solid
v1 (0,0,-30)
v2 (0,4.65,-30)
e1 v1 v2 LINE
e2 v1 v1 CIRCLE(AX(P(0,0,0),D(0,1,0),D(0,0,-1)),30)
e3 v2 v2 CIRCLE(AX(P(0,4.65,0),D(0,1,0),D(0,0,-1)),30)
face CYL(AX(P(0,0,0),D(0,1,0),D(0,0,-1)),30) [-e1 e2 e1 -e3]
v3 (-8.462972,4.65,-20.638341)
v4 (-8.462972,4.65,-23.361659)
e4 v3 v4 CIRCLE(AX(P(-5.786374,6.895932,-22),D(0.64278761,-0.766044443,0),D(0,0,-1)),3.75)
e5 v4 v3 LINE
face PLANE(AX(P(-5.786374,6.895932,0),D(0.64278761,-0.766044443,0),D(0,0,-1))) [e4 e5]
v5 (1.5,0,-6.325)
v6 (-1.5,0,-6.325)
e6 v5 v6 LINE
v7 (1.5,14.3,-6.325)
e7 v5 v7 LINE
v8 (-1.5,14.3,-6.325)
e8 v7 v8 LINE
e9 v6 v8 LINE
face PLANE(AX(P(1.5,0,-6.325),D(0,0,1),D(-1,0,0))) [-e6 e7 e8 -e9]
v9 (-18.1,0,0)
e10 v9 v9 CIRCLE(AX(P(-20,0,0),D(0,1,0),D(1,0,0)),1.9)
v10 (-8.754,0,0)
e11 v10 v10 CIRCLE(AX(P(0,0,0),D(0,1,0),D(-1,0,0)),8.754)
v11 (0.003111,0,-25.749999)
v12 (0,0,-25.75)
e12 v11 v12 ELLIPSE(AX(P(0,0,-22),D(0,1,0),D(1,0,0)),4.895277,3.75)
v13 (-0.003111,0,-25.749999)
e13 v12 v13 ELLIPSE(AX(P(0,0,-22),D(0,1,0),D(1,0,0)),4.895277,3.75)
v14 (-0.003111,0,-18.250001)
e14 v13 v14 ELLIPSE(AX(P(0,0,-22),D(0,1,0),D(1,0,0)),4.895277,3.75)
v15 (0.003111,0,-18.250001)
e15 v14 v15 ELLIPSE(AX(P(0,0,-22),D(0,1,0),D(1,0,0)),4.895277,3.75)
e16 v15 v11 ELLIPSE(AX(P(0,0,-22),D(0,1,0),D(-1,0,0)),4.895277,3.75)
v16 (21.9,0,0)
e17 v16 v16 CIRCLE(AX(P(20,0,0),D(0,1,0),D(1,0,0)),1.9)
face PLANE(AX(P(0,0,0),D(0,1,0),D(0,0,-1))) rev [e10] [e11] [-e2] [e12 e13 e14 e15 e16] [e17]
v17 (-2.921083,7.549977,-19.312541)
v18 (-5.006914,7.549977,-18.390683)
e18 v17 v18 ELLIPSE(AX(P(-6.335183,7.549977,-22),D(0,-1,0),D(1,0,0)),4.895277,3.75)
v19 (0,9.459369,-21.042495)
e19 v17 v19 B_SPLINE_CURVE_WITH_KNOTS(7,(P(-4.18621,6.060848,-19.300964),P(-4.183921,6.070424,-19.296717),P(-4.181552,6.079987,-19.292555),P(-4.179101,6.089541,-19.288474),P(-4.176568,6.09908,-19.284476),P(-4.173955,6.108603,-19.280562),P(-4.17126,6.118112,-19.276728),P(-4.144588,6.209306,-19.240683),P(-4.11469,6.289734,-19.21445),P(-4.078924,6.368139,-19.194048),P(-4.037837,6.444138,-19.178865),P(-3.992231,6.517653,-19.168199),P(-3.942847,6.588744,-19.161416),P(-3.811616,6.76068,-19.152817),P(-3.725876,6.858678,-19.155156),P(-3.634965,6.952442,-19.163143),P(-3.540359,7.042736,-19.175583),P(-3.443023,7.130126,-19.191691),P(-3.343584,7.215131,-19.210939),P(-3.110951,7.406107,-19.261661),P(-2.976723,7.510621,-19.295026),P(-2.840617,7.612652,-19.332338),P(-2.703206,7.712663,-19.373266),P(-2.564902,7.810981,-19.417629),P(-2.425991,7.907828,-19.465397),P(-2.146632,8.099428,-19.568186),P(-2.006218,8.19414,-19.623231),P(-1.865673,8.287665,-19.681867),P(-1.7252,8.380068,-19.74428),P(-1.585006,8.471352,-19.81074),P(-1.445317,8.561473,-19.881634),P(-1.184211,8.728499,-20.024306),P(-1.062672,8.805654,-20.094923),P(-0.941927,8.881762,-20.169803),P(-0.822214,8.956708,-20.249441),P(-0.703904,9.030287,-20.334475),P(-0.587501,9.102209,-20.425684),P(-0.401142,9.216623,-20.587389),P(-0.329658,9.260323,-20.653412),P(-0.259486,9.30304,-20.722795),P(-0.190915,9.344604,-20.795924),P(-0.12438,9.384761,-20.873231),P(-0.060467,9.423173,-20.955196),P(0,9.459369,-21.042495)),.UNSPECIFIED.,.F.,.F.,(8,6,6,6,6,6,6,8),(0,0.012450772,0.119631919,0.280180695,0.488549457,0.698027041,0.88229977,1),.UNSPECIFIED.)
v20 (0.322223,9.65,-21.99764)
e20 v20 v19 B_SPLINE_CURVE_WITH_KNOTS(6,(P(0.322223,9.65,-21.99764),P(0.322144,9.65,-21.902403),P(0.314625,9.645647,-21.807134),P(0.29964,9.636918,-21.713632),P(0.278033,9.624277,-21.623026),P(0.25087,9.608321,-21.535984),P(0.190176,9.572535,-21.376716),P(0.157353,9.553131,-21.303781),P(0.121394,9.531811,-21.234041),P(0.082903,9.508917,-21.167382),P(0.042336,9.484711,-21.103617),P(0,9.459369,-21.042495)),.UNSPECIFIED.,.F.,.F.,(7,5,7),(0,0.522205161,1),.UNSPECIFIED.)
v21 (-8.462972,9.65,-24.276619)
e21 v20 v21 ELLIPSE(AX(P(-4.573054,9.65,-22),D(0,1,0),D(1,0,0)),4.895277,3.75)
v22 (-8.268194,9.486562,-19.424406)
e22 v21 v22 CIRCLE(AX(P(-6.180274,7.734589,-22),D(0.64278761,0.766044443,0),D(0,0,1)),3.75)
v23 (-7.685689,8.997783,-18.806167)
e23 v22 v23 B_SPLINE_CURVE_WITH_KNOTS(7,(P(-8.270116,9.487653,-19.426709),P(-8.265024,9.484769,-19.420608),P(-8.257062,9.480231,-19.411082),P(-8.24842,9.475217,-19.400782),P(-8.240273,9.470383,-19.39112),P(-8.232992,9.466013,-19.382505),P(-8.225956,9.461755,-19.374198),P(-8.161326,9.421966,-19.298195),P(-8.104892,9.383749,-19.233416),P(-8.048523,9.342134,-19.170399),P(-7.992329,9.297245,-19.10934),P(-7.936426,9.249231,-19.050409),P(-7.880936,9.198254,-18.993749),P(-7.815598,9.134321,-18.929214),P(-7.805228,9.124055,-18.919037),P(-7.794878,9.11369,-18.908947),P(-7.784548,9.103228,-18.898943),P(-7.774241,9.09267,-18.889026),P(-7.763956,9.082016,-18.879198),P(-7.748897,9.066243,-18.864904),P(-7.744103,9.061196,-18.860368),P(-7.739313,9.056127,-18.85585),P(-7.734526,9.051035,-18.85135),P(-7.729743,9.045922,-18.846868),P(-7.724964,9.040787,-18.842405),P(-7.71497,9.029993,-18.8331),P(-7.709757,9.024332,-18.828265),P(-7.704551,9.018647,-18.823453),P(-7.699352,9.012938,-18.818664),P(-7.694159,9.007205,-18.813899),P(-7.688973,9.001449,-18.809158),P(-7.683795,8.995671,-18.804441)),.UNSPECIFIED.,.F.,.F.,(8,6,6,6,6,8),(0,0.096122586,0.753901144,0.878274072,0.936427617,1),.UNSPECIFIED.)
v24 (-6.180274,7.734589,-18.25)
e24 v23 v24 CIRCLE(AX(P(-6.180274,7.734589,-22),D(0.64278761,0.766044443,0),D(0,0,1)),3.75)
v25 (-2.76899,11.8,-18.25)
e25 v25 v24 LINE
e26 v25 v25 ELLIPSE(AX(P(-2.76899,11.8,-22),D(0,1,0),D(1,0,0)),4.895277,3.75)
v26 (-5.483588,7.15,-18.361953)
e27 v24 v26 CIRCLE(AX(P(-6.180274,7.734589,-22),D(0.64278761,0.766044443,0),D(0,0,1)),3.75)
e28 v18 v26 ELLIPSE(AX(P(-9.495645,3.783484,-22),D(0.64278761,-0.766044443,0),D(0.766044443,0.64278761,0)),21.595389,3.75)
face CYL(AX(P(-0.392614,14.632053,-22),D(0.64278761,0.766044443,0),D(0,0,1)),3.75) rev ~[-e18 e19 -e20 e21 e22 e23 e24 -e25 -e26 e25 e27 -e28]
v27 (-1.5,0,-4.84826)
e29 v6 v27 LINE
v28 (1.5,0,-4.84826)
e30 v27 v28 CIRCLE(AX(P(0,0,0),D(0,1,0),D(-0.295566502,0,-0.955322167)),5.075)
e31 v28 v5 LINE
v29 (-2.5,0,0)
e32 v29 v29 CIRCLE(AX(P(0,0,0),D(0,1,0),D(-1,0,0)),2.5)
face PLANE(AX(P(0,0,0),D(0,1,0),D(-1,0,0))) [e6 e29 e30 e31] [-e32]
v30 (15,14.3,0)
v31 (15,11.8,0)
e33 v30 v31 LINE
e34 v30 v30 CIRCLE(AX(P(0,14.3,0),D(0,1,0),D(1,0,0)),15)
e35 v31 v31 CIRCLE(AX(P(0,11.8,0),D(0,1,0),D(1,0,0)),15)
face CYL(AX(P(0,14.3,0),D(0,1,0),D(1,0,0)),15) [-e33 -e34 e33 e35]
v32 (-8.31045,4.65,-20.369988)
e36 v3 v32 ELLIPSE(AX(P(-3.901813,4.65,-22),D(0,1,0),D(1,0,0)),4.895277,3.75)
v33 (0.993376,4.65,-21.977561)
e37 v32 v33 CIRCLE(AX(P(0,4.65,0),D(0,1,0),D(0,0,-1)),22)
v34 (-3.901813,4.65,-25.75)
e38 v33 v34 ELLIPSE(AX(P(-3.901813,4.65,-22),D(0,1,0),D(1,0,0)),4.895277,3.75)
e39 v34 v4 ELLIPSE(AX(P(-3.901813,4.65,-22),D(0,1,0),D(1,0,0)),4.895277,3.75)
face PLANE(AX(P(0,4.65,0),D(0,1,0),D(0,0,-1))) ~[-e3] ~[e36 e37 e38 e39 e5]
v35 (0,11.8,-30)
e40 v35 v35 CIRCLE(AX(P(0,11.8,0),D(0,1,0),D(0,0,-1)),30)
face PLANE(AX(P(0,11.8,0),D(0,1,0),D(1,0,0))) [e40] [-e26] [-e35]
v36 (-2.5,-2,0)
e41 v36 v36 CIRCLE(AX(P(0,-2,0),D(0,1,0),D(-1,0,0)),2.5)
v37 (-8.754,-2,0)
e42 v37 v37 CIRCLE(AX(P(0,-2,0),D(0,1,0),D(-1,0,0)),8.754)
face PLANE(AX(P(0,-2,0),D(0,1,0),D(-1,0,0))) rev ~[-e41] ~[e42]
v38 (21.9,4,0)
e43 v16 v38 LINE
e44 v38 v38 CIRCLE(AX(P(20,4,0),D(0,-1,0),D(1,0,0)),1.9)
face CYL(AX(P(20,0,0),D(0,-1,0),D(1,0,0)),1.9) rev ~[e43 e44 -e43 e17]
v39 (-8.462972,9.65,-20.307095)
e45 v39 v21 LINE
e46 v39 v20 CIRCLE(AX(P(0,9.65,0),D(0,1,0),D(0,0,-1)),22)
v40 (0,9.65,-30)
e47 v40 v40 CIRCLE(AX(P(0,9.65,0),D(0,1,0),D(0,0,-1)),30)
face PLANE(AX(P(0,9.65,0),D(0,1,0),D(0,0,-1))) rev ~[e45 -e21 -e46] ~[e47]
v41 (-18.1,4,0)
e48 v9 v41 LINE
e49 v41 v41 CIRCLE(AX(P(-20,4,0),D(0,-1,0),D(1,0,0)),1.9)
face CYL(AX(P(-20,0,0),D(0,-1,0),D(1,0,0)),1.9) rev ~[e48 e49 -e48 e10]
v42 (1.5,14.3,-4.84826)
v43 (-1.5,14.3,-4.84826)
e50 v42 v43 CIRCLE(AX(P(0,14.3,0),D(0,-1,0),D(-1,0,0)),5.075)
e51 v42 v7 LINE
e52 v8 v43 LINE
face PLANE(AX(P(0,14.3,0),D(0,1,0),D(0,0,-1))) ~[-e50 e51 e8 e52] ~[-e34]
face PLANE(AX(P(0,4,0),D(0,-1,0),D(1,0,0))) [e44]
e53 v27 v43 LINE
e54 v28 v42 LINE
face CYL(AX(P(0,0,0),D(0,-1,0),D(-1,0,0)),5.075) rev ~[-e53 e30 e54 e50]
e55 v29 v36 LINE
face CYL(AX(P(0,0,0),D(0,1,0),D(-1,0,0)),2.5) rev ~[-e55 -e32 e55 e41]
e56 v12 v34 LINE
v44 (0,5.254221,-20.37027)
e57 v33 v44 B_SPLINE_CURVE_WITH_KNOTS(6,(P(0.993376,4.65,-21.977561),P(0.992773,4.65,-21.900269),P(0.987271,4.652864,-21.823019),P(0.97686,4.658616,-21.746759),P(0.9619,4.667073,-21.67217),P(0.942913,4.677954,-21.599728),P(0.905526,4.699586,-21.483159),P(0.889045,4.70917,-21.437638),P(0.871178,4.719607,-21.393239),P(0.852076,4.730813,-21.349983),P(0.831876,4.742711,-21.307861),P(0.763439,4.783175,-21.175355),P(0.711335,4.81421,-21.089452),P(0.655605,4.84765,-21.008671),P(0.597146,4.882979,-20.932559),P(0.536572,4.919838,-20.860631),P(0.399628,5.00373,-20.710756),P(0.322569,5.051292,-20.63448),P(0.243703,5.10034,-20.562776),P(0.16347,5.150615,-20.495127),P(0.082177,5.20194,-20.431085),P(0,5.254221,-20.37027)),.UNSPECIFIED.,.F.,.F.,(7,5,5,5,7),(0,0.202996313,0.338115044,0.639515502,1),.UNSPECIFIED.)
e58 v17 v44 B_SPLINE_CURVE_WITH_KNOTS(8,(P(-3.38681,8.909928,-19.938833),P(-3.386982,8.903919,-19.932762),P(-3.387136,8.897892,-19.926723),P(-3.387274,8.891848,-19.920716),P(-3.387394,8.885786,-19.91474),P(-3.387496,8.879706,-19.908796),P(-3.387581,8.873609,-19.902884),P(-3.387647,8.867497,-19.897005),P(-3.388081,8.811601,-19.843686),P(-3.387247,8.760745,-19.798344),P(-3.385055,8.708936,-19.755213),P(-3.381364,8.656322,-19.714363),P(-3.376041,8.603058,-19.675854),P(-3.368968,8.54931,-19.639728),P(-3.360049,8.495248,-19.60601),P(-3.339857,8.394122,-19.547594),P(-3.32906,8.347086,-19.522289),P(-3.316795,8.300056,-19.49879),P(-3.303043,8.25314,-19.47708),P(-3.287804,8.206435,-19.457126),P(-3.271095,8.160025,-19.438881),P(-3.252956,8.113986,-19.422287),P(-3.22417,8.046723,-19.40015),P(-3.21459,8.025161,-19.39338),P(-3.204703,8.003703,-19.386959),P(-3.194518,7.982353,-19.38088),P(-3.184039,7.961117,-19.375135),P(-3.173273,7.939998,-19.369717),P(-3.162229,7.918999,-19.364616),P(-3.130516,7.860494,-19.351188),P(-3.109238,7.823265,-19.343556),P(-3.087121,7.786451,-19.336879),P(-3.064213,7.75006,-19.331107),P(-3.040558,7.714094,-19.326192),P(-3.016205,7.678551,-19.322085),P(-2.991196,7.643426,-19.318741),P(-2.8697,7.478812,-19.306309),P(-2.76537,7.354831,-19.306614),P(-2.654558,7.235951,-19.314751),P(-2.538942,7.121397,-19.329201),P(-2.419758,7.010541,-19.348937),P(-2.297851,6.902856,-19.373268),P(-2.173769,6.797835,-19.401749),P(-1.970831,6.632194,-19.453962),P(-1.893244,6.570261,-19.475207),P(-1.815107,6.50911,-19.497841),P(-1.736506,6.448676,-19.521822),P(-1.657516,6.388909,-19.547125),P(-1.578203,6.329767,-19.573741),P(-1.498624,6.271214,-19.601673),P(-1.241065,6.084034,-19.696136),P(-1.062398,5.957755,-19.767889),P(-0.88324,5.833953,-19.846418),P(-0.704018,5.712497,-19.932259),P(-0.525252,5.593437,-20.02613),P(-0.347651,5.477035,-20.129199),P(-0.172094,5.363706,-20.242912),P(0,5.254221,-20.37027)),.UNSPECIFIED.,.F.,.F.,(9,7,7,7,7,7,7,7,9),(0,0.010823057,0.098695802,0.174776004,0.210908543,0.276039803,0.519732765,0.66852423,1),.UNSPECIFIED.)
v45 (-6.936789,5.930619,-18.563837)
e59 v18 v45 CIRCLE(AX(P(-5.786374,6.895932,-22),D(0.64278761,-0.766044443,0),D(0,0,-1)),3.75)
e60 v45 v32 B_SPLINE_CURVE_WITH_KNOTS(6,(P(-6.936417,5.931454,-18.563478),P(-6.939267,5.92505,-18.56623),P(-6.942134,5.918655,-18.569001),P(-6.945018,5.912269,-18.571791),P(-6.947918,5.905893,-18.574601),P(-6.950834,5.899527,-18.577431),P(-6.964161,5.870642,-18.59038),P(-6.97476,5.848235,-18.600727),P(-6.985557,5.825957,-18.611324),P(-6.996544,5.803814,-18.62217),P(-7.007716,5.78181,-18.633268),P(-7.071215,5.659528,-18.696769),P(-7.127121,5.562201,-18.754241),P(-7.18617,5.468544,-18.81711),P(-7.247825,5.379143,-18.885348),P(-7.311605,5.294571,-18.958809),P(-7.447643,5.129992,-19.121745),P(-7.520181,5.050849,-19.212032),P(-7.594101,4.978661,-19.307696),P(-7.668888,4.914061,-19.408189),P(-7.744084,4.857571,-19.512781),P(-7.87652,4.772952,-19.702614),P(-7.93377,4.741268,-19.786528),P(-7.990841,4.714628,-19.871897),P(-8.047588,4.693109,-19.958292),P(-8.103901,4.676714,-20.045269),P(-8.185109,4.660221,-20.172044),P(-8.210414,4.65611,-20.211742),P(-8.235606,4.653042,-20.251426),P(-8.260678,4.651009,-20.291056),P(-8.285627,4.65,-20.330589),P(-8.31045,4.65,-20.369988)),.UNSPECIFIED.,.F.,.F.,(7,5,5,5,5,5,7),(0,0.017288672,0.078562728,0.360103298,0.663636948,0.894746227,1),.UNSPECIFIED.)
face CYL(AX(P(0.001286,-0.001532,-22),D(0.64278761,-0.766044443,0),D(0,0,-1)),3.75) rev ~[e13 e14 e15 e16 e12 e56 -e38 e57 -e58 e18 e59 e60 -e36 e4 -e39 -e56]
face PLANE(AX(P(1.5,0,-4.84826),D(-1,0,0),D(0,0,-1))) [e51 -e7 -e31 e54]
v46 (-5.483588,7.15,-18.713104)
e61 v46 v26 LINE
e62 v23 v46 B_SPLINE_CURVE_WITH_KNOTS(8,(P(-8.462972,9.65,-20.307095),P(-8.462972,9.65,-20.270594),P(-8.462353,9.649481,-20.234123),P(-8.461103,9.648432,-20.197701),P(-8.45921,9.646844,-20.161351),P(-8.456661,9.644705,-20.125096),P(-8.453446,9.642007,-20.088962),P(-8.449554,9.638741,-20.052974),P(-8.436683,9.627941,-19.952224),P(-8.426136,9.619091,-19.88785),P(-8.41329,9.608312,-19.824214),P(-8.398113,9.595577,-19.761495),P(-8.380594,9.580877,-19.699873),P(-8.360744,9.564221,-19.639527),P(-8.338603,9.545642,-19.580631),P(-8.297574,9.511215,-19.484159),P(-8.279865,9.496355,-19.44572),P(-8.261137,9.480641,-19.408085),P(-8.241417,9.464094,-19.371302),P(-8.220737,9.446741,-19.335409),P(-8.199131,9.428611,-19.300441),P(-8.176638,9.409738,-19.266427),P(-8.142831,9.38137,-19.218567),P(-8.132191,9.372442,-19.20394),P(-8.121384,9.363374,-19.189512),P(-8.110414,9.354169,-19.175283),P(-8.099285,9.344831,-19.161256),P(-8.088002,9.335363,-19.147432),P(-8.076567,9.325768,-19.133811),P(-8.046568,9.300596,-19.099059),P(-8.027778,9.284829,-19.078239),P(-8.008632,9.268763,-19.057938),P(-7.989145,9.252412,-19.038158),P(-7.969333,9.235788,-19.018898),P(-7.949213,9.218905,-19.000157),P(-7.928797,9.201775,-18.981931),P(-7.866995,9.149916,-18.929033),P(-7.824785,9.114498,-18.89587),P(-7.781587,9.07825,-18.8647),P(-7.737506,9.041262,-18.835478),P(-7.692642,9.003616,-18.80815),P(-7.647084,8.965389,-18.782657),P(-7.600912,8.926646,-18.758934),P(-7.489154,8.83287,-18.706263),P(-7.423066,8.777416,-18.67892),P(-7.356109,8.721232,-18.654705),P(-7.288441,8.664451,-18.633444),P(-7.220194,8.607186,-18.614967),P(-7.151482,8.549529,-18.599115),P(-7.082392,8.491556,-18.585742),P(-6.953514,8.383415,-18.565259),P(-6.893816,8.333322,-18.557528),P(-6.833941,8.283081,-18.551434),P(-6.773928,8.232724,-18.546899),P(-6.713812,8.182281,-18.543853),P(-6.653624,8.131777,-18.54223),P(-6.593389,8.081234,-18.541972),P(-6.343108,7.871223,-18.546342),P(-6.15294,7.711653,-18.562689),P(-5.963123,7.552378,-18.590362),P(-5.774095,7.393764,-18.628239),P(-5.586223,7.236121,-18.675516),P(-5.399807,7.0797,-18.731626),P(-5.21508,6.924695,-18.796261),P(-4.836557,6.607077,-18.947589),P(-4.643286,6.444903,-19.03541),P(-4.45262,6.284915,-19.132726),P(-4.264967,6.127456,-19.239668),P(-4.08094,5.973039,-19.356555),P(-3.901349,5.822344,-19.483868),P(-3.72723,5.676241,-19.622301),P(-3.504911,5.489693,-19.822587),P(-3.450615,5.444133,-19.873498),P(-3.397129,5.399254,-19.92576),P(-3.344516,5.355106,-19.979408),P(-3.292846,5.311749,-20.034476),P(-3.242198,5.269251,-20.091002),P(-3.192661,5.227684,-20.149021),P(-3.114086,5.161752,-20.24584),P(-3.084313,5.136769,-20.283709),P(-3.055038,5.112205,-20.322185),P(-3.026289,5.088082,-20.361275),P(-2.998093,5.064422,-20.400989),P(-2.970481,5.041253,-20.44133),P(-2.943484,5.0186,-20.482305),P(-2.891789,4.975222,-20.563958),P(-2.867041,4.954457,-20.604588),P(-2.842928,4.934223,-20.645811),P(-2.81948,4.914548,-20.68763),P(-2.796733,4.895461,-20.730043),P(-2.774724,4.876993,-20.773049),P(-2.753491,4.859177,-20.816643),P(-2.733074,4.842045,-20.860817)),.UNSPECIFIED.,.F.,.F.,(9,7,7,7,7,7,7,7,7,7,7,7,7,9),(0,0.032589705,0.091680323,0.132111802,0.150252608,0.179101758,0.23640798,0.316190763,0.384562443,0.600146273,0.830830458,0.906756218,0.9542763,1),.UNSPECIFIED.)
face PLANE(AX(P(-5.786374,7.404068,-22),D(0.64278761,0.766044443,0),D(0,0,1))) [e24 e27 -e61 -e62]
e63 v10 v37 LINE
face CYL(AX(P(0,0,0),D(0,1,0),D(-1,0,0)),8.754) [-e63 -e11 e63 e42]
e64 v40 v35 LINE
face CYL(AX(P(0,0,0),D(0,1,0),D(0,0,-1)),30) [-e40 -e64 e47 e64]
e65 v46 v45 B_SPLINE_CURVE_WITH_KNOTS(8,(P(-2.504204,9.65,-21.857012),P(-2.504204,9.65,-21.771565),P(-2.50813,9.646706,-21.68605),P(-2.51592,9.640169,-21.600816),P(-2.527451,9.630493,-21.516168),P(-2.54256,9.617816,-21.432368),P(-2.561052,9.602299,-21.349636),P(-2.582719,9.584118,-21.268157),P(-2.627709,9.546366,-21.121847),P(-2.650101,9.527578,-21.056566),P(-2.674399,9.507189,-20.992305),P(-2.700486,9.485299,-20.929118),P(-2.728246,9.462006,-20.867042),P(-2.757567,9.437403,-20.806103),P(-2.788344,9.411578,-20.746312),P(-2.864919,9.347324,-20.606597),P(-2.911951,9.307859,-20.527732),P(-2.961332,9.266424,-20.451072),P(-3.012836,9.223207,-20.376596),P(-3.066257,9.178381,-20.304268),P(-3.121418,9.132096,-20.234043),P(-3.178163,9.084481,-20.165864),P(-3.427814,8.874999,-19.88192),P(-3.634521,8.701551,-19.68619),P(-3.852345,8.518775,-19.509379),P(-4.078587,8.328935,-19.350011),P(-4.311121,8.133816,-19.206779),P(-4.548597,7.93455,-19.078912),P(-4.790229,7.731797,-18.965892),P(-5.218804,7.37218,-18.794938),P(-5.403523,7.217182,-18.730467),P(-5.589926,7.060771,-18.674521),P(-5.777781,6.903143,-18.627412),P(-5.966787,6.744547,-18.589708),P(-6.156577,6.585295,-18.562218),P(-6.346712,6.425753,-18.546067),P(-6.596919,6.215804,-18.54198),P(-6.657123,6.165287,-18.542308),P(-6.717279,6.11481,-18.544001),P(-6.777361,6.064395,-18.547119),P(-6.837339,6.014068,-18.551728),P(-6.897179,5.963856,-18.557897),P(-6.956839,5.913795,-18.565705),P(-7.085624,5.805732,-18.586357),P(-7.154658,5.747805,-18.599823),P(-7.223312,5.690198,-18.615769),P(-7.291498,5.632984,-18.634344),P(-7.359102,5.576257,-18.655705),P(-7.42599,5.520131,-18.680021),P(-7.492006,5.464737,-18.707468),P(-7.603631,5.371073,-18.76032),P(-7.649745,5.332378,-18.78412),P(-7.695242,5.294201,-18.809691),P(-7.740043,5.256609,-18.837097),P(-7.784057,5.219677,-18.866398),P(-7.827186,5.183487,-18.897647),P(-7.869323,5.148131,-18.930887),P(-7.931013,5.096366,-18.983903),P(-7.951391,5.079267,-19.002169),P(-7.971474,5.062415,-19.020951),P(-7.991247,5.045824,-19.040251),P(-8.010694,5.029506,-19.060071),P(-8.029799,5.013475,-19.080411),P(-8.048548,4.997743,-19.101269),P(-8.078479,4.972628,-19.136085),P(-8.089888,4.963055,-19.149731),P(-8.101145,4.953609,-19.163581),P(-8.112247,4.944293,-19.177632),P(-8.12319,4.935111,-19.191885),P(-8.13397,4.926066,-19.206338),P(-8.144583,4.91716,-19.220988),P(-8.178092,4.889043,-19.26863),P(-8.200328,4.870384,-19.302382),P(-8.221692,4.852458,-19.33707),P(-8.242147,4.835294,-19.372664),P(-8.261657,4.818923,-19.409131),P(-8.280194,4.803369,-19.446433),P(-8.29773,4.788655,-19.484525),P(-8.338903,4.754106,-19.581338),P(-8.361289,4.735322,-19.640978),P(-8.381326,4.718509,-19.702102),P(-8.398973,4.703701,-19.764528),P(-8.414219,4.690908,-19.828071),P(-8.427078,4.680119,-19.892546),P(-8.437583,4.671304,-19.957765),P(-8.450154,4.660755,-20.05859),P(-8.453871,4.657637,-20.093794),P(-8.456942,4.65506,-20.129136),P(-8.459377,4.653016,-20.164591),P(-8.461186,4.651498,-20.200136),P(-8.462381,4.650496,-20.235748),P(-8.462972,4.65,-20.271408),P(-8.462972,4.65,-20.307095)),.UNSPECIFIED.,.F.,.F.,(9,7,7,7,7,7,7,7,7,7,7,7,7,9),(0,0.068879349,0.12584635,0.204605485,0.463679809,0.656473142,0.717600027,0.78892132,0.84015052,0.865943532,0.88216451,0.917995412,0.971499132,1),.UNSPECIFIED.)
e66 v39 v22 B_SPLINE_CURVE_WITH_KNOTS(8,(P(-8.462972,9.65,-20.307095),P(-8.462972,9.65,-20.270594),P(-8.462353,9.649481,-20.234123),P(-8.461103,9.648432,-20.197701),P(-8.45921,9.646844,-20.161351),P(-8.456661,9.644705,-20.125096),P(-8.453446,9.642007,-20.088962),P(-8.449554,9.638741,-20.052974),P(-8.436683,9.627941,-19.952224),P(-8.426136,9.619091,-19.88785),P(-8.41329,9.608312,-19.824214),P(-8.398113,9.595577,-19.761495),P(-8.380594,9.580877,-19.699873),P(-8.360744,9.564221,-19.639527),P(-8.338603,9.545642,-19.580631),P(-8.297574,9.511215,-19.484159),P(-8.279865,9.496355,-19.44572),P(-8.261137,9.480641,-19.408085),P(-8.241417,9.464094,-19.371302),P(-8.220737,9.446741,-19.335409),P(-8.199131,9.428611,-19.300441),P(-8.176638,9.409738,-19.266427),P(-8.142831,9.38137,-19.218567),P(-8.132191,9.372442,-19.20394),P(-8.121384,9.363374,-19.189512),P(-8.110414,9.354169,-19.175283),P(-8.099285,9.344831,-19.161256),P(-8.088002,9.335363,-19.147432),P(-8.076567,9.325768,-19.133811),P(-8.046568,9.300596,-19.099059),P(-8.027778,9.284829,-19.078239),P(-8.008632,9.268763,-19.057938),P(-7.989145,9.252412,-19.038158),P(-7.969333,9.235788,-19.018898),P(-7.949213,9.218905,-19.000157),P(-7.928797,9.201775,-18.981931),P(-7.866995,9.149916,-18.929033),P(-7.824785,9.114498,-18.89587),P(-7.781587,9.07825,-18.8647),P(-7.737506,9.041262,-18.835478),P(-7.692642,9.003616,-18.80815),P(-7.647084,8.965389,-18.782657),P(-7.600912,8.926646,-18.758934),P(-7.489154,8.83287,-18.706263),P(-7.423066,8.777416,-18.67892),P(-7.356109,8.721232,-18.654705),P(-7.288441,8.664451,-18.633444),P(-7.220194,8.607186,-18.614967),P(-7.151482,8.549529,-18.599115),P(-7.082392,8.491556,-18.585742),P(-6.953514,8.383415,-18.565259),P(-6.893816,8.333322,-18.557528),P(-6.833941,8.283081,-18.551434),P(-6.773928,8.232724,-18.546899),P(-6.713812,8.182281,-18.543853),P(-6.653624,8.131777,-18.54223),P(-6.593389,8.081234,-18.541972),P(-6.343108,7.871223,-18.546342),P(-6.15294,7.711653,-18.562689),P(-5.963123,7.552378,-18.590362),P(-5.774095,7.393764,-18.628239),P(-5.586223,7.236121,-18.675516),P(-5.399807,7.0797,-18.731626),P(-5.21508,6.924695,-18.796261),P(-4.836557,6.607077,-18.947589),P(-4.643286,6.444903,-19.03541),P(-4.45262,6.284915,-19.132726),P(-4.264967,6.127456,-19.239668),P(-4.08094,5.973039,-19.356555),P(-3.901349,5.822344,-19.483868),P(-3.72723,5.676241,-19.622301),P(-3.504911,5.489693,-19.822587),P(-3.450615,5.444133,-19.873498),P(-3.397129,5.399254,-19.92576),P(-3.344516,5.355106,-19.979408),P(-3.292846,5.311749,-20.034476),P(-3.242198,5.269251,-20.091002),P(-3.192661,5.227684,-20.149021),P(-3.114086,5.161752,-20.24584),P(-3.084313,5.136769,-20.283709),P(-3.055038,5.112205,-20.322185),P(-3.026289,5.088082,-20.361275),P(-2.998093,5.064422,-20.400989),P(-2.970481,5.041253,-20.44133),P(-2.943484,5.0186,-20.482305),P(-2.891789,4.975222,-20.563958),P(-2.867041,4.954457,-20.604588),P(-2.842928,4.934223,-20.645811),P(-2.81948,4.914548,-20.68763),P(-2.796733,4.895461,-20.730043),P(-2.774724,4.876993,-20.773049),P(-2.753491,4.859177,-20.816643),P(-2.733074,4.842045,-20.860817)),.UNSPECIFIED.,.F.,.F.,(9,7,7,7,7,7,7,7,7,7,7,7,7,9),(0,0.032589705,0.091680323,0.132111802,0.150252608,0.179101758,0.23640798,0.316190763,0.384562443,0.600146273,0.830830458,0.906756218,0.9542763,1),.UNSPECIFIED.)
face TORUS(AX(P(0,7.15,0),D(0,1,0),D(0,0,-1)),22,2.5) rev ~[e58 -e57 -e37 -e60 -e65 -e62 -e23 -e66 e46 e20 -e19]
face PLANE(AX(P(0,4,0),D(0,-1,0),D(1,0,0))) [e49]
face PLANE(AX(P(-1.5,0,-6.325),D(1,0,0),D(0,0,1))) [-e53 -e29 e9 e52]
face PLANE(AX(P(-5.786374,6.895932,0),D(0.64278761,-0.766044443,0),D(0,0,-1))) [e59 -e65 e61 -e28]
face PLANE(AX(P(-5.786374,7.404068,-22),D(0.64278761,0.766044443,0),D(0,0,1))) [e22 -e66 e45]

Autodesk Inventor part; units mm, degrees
ref_plane "YZ Plane" through (0, 0, 0) normal (1, 0, 0) x (0, 1, 0)
sketch "Sketch1" plane through (0, 0, 0) normal (0, 1, 0) x (-1, 0, 0)
  circle A0 centre (0, 0) radius 5.075
  circle A1 centre (0, 0) radius 20
  line L0 (1.5, -3.825) -> (-1.5, -3.825)
  line L1 (-1.5, -3.825) -> (-1.5, -6.325)
  line L2 (-1.5, -6.325) -> (1.5, -6.325)
  line L3 (1.5, -6.325) -> (1.5, -3.825)
  line L4 (1.5, -3.825) -> (-1.5, -6.325) construction
  line L5 (-1.5, -3.825) -> (1.5, -6.325) construction
  circle A2 centre (0, 0) radius 2.5
  circle A3 centre (0, 0) radius 8.754
  point P0 (0, -5.075)
  point P1 (-1.5, -4.8483)
  point P2 (1.5, -4.8483)
  dimension "d0" = 10.15
  dimension "d1" = 40
  dimension "d2" = 1.25
  dimension "d3" = 3
  dimension "d17" = 5
extrude "Extrusion1" add sketch "Sketch1" along normal blind 14.3 contours A1 | A3
sketch "Sketch2" plane through (0, 0, 0) normal (1, 0, 0) x (0, 1, 0)
  line L0 (0, 0) -> (14.3, 0)
  line L1 (14.3, 0) -> (14.3, -22)
  line L2 (14.3, -22) -> (0, -22) construction
  line L3 (0, -22) -> (0, 0)
  line L4 (0, -22) -> (14.3, -22) construction
  line L5 (14.3, -22) -> (14.3, -20.0661)
  line L6 (0, -20) -> (14.3, -20) projected
  circle A0 centre (7.15, -22) radius 2.5
  line L7 (9.65, -22) -> (4.65, -22)
  line L8 (4.65, -22) -> (4.65, -30)
  line L9 (4.65, -30) -> (9.65, -30)
  line L10 (9.65, -30) -> (9.65, -22)
  line L11 (14.3, -20) -> (0, -20)
  line L12 (0, -20) -> (0, -30)
  line L13 (0, -30) -> (14.3, -30)
  line L14 (14.3, -30) -> (14.3, -20)
  point P0 (4.65, -30)
  point P1 (5.65, -20)
  point P2 (14.3, -22)
  point P3 (14.3, -20)
  point P4 (8.65, -20)
  point P5 (9.65, -30)
  point P6 (14.3, -20)
  point P7 (8.65, -20)
  dimension "d22" = 5
  dimension "d7" = 22
  dimension "d10" = 14.3
  dimension "d23" = 8
  dimension "d31" = 10
  dimension "d41" = 14.3
  dimension "d42" = 5
  dimension "d56" = 30
revolve "Revolution1" add sketch "Sketch2" angle 360 about axis through (0, 0, 0) along (0, 1, 0) contours L0 L1 L6 A0 L3 | L6 A0 L8 L13 L12 L3 | L1 L14 L13 L10 A0 L6 | A0 L6
extrude "Extrusion3" add sketch "Sketch1" against normal blind 2 contours A0 L3 L0 L1 | L1 L0 L3 A0 | A0 L3 L2 L1 | A3
revolve "Revolution4" cut sketch "Sketch2" angle 360 about axis through (0, 0, 0) along (0, 1, 0) contours A0 L6
sketch "Sketch3" plane through (0, 0, 0) normal (0, -1, 0) x (1, 0, 0)
  line L0 (0, 0) -> (0, -22)
  dimension "d25" = 22
ref_plane "Work Plane1" through (0, 0, 0) normal (0.6427876, -0.7660444, 0) x (0, 0, -1)
sketch "Sketch4" plane through (0, 0, 0) normal (0.6427876, -0.7660444, 0) x (0, 0, -1)
  ellipse E0 centre (0, 2.7318) end of major axis (22, 2.7318) minor radius 16.853 projected
  line L0 (0, 0) -> (22, 0)
  circle A0 centre (22, 0) radius 3.75
  dimension "d27" = 22
  dimension "d28" = 7.5
extrude "Extrusion4" cut sketch "Sketch4" against normal blind 9 contours E0 L0 A0 | E0 A0 | E0 A0 L0 picked at (24.3646, -0.3075)
extrude "Extrusion5" cut sketch "Sketch4" along normal blind 7 contours E0 L0 A0 | E0 A0 | E0 A0 L0 picked at (24.3646, -0.3075)
ref_plane "Work Plane2" through (0, 14.3, -22) normal (0.6427876, 0.7660444, 0) x (0, 0, 1)
sketch "Sketch5" plane through (0, 14.3, -22) normal (0.6427876, 0.7660444, 0) x (0, 0, 1)
  ellipse E0 centre (22, -0.5142) end of major axis (27.075, -0.5142) minor radius 3.8877 (17.1517, -1.6633) -> (17.1517, 0.6348) ccw projected
  line L0 (22, -0.5142) -> (0, -0.5142)
  circle A0 centre (0, -0.5142) radius 3.75
  point P0 (22, 9.1919)
  dimension "d35" = 22
  dimension "d36" = 7.5
extrude "Extrusion6" cut sketch "Sketch5" against normal blind 9
extrude "Extrusion7" cut sketch "Sketch5" along normal blind 8
extrude "Extrusion8" cut sketch "Sketch1" along normal through all contours A0 L3 L0 L1 | L1 L0 L3 A0 | A0 L3 L2 L1 | A2
sketch "Sketch6" plane through (0, 14.3, 0) normal (0, 1, 0) x (1, 0, 0)
  circle A0 centre (0, 0) radius 15
  circle A1 centre (0, 0) radius 35.6972
  dimension "d45" = 30
extrude "Extrusion9" cut sketch "Sketch6" against normal blind 2.5
sketch "Sketch7" plane through (0, 0, 0) normal (0, -1, 0) x (1, 0, 0)
  circle A0 centre (0, 0) radius 2.5 projected
  circle A1 centre (0, 0) radius 20
  line L0 (24, -7.5) -> (-24, -7.5)
  line L1 (-24, -7.5) -> (-24, 7.5)
  line L2 (-24, 7.5) -> (24, 7.5)
  line L3 (24, 7.5) -> (24, -7.5)
  line L4 (24, -7.5) -> (-24, 7.5) construction
  line L5 (-24, -7.5) -> (24, 7.5) construction
  circle A2 centre (0, 0) radius 11
  circle A3 centre (20, 0) radius 1.9
  circle A4 centre (-20, 0) radius 1.9
  dimension "d48" = 40
  dimension "d49" = 48
  dimension "d50" = 15
  dimension "d51" = 22
  dimension "d52" = 3.8
  dimension "d53" = 3.8
extrude "Extrusion10" cut sketch "Sketch7" against normal blind 4 contours A1 A3 | A1 A3 | A4 A1 | A1 A4
properties part number "spool_temp"
